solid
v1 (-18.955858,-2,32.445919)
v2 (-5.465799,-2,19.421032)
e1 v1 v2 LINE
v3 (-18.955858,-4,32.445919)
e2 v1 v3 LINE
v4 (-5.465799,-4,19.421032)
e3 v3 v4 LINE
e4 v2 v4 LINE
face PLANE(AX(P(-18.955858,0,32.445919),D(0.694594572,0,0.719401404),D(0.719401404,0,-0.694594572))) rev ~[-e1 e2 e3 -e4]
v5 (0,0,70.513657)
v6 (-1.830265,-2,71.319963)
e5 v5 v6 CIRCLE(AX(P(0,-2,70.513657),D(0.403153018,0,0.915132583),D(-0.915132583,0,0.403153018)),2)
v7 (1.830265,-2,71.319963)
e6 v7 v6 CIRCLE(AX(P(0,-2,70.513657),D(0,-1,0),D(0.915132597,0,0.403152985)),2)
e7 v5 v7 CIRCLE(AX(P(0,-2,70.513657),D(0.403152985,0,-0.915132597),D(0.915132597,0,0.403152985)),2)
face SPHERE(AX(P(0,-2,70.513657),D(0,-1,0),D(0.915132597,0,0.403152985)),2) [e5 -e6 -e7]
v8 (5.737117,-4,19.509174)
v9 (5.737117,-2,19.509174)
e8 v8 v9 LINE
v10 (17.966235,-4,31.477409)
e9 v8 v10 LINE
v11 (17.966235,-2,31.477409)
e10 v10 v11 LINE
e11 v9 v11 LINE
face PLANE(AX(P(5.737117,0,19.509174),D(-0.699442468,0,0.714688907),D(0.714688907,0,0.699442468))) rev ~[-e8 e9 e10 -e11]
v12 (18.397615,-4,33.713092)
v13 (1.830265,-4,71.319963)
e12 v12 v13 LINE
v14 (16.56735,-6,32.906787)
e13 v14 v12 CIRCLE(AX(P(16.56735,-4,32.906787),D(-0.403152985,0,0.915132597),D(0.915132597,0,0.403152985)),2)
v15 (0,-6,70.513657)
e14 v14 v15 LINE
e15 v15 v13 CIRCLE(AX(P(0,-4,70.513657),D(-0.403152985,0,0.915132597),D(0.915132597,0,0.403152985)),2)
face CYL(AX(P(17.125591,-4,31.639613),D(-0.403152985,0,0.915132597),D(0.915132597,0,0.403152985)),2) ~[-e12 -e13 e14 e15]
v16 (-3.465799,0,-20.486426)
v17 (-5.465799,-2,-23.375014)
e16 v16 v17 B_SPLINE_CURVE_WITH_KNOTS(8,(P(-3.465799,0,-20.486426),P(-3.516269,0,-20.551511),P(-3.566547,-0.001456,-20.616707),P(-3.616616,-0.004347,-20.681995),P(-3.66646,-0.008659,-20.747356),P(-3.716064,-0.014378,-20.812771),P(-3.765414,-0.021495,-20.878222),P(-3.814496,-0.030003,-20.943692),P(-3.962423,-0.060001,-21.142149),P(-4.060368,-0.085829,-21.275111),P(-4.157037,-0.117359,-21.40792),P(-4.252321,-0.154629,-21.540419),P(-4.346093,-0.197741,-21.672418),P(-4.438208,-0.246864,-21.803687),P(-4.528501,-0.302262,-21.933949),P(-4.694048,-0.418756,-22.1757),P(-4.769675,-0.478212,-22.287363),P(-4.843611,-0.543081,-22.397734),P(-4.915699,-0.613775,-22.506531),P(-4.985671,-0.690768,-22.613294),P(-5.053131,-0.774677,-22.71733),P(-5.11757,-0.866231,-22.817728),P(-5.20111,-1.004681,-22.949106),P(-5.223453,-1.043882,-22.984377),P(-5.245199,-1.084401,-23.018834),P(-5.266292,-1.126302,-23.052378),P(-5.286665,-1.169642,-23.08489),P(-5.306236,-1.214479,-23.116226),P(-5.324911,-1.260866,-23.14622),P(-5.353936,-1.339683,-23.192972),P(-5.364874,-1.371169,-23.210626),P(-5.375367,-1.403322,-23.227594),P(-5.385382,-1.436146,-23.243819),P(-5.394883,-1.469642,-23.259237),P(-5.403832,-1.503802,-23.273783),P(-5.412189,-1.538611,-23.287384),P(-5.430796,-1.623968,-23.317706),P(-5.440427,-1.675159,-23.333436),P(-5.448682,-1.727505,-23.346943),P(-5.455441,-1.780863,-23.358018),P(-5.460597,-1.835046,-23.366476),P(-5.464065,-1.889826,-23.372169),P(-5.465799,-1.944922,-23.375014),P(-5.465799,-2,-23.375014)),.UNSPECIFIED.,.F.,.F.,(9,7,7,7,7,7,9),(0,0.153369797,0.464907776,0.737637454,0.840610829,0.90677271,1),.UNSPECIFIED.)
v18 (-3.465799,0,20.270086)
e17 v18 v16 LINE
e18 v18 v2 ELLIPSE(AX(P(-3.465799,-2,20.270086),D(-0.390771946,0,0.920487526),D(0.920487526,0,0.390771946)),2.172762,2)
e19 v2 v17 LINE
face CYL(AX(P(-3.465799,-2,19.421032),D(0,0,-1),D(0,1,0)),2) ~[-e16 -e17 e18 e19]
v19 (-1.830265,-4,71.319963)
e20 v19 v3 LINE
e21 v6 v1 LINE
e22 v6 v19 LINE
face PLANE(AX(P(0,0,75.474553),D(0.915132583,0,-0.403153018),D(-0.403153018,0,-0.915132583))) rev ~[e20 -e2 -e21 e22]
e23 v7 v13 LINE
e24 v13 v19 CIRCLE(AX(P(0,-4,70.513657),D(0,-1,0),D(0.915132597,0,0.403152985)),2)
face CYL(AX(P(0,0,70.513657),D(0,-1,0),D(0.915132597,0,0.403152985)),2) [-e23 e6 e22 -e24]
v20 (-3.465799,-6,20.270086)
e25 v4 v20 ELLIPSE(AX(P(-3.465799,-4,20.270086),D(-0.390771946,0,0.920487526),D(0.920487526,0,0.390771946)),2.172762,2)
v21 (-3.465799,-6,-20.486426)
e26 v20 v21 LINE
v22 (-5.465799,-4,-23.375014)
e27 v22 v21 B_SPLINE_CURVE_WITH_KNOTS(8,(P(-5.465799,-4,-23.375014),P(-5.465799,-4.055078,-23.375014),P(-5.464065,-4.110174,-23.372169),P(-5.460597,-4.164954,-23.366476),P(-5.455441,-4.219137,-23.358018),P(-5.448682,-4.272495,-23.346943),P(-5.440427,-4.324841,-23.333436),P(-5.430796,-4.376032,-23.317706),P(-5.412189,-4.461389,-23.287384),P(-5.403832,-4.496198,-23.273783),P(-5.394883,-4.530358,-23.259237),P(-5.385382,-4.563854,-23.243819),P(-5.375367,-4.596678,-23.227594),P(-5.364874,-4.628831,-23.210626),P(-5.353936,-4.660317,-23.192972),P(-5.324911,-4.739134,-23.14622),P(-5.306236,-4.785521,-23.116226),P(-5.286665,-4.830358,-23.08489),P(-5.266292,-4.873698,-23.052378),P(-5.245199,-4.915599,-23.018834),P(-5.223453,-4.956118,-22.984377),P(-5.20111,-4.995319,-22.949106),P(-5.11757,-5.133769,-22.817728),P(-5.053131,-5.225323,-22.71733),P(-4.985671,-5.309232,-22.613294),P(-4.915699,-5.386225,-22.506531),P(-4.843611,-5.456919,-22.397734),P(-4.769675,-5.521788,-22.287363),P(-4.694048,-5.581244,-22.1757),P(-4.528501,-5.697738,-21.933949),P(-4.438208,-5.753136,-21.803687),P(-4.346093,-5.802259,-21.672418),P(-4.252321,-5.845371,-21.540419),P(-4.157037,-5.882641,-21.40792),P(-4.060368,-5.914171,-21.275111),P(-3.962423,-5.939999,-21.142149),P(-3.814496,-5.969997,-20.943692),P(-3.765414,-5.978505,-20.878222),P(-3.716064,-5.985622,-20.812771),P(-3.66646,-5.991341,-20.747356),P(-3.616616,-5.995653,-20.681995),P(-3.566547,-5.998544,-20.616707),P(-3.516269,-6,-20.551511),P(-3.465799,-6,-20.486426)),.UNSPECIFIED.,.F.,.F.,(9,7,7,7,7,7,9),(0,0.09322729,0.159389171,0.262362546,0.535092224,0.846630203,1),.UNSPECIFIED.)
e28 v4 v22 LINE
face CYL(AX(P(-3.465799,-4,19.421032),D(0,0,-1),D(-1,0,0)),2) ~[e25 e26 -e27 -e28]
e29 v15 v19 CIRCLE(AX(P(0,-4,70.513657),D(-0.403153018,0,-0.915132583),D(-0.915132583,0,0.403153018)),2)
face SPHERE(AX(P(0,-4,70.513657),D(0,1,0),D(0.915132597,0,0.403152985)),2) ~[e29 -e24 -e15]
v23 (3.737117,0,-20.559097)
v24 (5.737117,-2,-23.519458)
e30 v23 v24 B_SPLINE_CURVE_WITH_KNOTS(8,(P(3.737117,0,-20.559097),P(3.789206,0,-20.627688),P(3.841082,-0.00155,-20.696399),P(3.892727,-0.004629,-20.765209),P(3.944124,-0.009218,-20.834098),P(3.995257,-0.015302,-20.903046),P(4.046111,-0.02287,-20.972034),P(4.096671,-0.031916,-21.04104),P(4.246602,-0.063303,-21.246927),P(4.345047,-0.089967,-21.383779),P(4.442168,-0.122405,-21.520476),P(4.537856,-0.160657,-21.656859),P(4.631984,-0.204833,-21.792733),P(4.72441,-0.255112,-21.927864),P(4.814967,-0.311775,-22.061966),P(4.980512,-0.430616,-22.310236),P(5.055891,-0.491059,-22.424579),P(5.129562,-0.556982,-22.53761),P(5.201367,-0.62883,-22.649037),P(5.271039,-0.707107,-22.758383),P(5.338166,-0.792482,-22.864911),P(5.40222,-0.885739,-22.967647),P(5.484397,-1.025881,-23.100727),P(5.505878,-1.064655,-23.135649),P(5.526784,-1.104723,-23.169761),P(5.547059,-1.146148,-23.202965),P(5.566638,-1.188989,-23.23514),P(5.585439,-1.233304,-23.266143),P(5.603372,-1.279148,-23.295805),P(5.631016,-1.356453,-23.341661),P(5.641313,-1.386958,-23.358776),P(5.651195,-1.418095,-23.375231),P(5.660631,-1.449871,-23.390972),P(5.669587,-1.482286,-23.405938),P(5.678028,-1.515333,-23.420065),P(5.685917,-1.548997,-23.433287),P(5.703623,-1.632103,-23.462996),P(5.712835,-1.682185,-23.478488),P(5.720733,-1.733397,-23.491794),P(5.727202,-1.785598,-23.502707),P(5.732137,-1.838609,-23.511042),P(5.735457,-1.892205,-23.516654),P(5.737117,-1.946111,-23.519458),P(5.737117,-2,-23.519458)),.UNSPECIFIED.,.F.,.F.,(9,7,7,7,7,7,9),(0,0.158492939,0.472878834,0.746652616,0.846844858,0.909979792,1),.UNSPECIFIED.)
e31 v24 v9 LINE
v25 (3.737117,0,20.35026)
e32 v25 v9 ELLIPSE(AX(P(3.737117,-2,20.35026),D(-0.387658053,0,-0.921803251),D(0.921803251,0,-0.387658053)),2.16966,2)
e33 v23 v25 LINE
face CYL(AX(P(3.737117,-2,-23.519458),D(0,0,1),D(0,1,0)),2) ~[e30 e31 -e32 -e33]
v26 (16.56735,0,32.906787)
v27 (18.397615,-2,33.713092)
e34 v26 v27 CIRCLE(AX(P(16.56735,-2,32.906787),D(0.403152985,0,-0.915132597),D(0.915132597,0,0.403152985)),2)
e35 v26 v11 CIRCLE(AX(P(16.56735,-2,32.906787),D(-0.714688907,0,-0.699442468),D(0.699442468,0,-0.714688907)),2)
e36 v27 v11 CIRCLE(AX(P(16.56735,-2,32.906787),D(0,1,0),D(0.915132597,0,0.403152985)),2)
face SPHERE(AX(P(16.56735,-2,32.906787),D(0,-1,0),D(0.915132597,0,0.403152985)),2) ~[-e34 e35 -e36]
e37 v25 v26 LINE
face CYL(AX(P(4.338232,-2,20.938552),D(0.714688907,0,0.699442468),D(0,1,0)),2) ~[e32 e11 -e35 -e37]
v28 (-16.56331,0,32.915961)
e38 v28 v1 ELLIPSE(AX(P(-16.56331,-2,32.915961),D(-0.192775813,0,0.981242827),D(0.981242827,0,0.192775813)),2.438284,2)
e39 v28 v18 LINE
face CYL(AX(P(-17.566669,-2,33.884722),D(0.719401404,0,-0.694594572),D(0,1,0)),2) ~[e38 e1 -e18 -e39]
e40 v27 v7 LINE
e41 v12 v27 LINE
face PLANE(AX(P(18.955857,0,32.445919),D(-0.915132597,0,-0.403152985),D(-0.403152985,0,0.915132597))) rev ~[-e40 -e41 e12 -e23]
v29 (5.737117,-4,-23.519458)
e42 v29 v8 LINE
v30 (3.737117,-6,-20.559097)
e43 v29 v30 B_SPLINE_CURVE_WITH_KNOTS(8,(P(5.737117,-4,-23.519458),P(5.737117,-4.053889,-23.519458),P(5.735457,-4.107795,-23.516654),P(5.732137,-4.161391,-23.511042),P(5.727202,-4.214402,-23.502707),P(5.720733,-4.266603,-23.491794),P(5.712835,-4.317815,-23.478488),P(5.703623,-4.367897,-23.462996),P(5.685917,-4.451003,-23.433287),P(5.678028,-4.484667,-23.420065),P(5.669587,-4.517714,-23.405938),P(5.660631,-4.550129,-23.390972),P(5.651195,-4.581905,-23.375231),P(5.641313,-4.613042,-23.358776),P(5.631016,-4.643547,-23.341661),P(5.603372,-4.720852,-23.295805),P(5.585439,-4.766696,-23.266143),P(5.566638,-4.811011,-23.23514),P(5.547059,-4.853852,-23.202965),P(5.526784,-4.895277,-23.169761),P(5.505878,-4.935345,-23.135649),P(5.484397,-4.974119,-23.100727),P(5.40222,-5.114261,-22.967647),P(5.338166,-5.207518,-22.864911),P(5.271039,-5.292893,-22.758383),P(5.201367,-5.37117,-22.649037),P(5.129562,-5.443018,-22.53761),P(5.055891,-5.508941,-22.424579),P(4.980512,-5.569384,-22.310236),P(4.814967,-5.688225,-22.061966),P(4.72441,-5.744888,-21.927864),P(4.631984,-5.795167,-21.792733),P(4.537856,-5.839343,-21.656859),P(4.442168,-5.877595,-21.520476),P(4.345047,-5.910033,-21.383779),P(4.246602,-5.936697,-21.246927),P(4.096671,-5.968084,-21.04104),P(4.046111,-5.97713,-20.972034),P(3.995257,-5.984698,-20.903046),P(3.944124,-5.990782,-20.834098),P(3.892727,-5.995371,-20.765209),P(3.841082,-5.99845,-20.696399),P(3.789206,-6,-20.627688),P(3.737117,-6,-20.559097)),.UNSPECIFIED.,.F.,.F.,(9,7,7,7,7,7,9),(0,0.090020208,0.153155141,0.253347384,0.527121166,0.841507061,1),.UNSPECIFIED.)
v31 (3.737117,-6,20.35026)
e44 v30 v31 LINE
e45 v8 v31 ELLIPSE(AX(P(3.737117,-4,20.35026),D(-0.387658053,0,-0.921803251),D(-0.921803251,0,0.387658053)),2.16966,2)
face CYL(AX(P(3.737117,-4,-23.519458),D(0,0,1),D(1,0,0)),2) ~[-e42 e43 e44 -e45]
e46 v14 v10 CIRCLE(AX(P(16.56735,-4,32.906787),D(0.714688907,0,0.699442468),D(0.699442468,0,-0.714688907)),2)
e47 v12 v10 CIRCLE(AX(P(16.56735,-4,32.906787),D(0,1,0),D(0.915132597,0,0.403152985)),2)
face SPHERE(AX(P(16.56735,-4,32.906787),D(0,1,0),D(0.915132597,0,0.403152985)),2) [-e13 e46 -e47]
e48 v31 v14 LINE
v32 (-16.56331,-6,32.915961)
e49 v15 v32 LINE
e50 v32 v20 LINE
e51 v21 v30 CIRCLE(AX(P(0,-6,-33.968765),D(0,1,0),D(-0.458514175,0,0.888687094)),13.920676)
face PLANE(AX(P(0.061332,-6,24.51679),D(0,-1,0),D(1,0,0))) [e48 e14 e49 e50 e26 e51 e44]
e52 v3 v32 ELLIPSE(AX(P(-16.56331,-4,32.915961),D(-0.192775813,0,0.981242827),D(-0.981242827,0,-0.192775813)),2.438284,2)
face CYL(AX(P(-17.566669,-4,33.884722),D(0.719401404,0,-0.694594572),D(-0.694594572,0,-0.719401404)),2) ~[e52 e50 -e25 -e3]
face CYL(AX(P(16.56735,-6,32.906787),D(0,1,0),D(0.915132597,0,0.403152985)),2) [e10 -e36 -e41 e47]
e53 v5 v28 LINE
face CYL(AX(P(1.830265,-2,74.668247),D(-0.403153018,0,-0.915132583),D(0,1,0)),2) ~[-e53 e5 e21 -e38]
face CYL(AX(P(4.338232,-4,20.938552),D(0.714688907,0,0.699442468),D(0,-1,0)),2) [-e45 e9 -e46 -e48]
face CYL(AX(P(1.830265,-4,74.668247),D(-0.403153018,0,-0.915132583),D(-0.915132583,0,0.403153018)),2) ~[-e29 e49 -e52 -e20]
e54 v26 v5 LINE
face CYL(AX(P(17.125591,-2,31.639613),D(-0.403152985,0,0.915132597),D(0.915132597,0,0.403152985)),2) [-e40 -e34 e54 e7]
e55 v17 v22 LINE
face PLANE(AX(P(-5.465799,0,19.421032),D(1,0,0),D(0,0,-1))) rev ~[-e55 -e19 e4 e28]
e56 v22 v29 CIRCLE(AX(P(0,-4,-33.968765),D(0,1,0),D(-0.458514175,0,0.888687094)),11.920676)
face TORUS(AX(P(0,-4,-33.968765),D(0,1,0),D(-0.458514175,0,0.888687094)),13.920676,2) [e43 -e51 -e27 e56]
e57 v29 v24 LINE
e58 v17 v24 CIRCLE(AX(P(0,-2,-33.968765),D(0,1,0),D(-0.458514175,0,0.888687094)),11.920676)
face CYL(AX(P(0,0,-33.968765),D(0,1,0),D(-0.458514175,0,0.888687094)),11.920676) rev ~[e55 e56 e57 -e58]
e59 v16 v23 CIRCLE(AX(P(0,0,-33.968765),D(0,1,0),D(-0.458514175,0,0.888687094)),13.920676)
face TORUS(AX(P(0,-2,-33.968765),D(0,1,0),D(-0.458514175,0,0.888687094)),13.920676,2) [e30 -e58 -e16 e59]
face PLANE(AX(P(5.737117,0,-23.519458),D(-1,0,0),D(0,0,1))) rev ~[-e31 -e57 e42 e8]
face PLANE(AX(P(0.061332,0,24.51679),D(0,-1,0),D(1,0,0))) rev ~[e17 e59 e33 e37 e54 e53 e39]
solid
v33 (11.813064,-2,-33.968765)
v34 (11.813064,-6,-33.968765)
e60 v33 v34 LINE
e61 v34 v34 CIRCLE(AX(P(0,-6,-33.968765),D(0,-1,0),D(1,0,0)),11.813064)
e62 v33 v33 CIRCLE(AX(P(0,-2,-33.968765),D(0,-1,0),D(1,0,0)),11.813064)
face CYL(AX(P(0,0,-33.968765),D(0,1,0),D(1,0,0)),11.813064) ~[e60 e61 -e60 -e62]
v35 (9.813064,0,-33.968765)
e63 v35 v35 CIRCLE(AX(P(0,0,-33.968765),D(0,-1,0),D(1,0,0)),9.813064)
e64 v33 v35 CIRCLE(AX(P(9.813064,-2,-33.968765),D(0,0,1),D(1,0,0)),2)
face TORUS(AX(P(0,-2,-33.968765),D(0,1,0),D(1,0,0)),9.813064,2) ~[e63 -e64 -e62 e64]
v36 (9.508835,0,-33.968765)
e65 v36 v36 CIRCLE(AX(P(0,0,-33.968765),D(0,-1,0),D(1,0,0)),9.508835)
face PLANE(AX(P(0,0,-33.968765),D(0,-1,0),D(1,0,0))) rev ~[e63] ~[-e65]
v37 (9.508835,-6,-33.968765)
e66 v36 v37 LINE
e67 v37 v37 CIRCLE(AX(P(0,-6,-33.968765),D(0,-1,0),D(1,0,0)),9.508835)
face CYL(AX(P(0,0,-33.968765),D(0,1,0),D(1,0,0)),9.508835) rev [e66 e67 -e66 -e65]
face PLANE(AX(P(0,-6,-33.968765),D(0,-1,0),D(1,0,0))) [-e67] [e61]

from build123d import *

# Parameters (mm, degrees)
F1_DEPTH = 5
F2_DEPTH = 6
F0_R     = 11.813064162
F0_R_2   = 9.5088348367
F3_R     = 2
F3_2_R   = 2


# Not quite as in the source:
# - a feature of the source that left no trace in its solid (it failed there, or was rolled back) is left out


with BuildPart() as f1:
    # F0 (on Front) → F1 (new body)
    with BuildSketch(Plane.XZ):
        with BuildLine():
            Line((18.9558565617, 32.4459187686), (0, 75.4745528102))
            Line((0, 75.4745528102), (-18.9558584243, 32.4459187686))
            Line((-18.9558584243, 32.4459187686), (-5.4657990113, 19.4210316986))
            Line((-5.4657990113, 19.4210316986), (-5.4657990113, 0))
            Line((-5.4657990113, 0), (-5.4657990113, -23.3750138432))
            ThreePointArc((-5.4657990113, -23.3750138432), (0.1536859635, -22.0490794669), (5.7371167932, -23.5194581672))
            Line((5.7371167932, -23.5194581672), (5.7371167932, 0.0881423131))
            Line((5.7371167932, 0.0881423131), (5.7371167932, 19.5091740117))
            Line((5.7371167932, 19.5091740117), (18.9558565617, 32.4459187686))
        make_face()
    extrude(amount=F1_DEPTH)

    # F0 (on Front) → F2 (join)
    with BuildSketch(Plane.XZ):
        with BuildLine():
            Line((18.9558565617, 32.4459187686), (0, 75.4745528102))
            Line((0, 75.4745528102), (-18.9558584243, 32.4459187686))
            Line((-18.9558584243, 32.4459187686), (-5.4657990113, 19.4210316986))
            Line((-5.4657990113, 19.4210316986), (-5.4657990113, 0))
            Line((-5.4657990113, 0), (-5.4657990113, -23.3750138432))
            ThreePointArc((-5.4657990113, -23.3750138432), (0.1536859635, -22.0490794669), (5.7371167932, -23.5194581672))
            Line((5.7371167932, -23.5194581672), (5.7371167932, 0.0881423131))
            Line((5.7371167932, 0.0881423131), (5.7371167932, 19.5091740117))
            Line((5.7371167932, 19.5091740117), (18.9558565617, 32.4459187686))
        make_face()
    extrude(amount=F2_DEPTH)

    # F3
    f3_edges = [f1.edges().sort_by_distance(p)[0] for p in [
        (9.477928, -6, 53.960236),
        (-9.477929, -6, 53.960236),
        (-12.210829, -6, 25.933475),
        (-5.465799, -6, -1.976991),
        (0.153686, -6, -22.049079),
        (5.737117, -6, -2.005142),
        (12.346487, -6, 25.977546),
        (18.955857, -3, 32.445919),
        (0, -3, 75.474553),
        (9.477928, 0, 53.960236),
        (12.346487, 0, 25.977546),
        (-12.210829, 0, 25.933475),
        (-5.465799, 0, -1.976991),
        (5.737117, 0, -2.005142),
        (-9.477929, 0, 53.960236),
        (0.153686, 0, -22.049079),
    ]]
    fillet(f3_edges, radius=F3_R)


with BuildPart() as f2:
    # F0 (on Front) → F2, piece 2 (new body)
    with BuildSketch(Plane.XZ):
        with Locations((0, -33.9687649328)):
            Circle(F0_R)
        with Locations((0, -33.9687649328)):
            Circle(F0_R_2, mode=Mode.SUBTRACT)
    extrude(amount=F2_DEPTH)

    # F3#2
    f3_2_edges = [f2.edges().sort_by_distance(p)[0] for p in [
        (-11.813064, 0, -33.968765),
    ]]
    fillet(f3_2_edges, radius=F3_2_R)


solid = Compound([f1.part, f2.part])
